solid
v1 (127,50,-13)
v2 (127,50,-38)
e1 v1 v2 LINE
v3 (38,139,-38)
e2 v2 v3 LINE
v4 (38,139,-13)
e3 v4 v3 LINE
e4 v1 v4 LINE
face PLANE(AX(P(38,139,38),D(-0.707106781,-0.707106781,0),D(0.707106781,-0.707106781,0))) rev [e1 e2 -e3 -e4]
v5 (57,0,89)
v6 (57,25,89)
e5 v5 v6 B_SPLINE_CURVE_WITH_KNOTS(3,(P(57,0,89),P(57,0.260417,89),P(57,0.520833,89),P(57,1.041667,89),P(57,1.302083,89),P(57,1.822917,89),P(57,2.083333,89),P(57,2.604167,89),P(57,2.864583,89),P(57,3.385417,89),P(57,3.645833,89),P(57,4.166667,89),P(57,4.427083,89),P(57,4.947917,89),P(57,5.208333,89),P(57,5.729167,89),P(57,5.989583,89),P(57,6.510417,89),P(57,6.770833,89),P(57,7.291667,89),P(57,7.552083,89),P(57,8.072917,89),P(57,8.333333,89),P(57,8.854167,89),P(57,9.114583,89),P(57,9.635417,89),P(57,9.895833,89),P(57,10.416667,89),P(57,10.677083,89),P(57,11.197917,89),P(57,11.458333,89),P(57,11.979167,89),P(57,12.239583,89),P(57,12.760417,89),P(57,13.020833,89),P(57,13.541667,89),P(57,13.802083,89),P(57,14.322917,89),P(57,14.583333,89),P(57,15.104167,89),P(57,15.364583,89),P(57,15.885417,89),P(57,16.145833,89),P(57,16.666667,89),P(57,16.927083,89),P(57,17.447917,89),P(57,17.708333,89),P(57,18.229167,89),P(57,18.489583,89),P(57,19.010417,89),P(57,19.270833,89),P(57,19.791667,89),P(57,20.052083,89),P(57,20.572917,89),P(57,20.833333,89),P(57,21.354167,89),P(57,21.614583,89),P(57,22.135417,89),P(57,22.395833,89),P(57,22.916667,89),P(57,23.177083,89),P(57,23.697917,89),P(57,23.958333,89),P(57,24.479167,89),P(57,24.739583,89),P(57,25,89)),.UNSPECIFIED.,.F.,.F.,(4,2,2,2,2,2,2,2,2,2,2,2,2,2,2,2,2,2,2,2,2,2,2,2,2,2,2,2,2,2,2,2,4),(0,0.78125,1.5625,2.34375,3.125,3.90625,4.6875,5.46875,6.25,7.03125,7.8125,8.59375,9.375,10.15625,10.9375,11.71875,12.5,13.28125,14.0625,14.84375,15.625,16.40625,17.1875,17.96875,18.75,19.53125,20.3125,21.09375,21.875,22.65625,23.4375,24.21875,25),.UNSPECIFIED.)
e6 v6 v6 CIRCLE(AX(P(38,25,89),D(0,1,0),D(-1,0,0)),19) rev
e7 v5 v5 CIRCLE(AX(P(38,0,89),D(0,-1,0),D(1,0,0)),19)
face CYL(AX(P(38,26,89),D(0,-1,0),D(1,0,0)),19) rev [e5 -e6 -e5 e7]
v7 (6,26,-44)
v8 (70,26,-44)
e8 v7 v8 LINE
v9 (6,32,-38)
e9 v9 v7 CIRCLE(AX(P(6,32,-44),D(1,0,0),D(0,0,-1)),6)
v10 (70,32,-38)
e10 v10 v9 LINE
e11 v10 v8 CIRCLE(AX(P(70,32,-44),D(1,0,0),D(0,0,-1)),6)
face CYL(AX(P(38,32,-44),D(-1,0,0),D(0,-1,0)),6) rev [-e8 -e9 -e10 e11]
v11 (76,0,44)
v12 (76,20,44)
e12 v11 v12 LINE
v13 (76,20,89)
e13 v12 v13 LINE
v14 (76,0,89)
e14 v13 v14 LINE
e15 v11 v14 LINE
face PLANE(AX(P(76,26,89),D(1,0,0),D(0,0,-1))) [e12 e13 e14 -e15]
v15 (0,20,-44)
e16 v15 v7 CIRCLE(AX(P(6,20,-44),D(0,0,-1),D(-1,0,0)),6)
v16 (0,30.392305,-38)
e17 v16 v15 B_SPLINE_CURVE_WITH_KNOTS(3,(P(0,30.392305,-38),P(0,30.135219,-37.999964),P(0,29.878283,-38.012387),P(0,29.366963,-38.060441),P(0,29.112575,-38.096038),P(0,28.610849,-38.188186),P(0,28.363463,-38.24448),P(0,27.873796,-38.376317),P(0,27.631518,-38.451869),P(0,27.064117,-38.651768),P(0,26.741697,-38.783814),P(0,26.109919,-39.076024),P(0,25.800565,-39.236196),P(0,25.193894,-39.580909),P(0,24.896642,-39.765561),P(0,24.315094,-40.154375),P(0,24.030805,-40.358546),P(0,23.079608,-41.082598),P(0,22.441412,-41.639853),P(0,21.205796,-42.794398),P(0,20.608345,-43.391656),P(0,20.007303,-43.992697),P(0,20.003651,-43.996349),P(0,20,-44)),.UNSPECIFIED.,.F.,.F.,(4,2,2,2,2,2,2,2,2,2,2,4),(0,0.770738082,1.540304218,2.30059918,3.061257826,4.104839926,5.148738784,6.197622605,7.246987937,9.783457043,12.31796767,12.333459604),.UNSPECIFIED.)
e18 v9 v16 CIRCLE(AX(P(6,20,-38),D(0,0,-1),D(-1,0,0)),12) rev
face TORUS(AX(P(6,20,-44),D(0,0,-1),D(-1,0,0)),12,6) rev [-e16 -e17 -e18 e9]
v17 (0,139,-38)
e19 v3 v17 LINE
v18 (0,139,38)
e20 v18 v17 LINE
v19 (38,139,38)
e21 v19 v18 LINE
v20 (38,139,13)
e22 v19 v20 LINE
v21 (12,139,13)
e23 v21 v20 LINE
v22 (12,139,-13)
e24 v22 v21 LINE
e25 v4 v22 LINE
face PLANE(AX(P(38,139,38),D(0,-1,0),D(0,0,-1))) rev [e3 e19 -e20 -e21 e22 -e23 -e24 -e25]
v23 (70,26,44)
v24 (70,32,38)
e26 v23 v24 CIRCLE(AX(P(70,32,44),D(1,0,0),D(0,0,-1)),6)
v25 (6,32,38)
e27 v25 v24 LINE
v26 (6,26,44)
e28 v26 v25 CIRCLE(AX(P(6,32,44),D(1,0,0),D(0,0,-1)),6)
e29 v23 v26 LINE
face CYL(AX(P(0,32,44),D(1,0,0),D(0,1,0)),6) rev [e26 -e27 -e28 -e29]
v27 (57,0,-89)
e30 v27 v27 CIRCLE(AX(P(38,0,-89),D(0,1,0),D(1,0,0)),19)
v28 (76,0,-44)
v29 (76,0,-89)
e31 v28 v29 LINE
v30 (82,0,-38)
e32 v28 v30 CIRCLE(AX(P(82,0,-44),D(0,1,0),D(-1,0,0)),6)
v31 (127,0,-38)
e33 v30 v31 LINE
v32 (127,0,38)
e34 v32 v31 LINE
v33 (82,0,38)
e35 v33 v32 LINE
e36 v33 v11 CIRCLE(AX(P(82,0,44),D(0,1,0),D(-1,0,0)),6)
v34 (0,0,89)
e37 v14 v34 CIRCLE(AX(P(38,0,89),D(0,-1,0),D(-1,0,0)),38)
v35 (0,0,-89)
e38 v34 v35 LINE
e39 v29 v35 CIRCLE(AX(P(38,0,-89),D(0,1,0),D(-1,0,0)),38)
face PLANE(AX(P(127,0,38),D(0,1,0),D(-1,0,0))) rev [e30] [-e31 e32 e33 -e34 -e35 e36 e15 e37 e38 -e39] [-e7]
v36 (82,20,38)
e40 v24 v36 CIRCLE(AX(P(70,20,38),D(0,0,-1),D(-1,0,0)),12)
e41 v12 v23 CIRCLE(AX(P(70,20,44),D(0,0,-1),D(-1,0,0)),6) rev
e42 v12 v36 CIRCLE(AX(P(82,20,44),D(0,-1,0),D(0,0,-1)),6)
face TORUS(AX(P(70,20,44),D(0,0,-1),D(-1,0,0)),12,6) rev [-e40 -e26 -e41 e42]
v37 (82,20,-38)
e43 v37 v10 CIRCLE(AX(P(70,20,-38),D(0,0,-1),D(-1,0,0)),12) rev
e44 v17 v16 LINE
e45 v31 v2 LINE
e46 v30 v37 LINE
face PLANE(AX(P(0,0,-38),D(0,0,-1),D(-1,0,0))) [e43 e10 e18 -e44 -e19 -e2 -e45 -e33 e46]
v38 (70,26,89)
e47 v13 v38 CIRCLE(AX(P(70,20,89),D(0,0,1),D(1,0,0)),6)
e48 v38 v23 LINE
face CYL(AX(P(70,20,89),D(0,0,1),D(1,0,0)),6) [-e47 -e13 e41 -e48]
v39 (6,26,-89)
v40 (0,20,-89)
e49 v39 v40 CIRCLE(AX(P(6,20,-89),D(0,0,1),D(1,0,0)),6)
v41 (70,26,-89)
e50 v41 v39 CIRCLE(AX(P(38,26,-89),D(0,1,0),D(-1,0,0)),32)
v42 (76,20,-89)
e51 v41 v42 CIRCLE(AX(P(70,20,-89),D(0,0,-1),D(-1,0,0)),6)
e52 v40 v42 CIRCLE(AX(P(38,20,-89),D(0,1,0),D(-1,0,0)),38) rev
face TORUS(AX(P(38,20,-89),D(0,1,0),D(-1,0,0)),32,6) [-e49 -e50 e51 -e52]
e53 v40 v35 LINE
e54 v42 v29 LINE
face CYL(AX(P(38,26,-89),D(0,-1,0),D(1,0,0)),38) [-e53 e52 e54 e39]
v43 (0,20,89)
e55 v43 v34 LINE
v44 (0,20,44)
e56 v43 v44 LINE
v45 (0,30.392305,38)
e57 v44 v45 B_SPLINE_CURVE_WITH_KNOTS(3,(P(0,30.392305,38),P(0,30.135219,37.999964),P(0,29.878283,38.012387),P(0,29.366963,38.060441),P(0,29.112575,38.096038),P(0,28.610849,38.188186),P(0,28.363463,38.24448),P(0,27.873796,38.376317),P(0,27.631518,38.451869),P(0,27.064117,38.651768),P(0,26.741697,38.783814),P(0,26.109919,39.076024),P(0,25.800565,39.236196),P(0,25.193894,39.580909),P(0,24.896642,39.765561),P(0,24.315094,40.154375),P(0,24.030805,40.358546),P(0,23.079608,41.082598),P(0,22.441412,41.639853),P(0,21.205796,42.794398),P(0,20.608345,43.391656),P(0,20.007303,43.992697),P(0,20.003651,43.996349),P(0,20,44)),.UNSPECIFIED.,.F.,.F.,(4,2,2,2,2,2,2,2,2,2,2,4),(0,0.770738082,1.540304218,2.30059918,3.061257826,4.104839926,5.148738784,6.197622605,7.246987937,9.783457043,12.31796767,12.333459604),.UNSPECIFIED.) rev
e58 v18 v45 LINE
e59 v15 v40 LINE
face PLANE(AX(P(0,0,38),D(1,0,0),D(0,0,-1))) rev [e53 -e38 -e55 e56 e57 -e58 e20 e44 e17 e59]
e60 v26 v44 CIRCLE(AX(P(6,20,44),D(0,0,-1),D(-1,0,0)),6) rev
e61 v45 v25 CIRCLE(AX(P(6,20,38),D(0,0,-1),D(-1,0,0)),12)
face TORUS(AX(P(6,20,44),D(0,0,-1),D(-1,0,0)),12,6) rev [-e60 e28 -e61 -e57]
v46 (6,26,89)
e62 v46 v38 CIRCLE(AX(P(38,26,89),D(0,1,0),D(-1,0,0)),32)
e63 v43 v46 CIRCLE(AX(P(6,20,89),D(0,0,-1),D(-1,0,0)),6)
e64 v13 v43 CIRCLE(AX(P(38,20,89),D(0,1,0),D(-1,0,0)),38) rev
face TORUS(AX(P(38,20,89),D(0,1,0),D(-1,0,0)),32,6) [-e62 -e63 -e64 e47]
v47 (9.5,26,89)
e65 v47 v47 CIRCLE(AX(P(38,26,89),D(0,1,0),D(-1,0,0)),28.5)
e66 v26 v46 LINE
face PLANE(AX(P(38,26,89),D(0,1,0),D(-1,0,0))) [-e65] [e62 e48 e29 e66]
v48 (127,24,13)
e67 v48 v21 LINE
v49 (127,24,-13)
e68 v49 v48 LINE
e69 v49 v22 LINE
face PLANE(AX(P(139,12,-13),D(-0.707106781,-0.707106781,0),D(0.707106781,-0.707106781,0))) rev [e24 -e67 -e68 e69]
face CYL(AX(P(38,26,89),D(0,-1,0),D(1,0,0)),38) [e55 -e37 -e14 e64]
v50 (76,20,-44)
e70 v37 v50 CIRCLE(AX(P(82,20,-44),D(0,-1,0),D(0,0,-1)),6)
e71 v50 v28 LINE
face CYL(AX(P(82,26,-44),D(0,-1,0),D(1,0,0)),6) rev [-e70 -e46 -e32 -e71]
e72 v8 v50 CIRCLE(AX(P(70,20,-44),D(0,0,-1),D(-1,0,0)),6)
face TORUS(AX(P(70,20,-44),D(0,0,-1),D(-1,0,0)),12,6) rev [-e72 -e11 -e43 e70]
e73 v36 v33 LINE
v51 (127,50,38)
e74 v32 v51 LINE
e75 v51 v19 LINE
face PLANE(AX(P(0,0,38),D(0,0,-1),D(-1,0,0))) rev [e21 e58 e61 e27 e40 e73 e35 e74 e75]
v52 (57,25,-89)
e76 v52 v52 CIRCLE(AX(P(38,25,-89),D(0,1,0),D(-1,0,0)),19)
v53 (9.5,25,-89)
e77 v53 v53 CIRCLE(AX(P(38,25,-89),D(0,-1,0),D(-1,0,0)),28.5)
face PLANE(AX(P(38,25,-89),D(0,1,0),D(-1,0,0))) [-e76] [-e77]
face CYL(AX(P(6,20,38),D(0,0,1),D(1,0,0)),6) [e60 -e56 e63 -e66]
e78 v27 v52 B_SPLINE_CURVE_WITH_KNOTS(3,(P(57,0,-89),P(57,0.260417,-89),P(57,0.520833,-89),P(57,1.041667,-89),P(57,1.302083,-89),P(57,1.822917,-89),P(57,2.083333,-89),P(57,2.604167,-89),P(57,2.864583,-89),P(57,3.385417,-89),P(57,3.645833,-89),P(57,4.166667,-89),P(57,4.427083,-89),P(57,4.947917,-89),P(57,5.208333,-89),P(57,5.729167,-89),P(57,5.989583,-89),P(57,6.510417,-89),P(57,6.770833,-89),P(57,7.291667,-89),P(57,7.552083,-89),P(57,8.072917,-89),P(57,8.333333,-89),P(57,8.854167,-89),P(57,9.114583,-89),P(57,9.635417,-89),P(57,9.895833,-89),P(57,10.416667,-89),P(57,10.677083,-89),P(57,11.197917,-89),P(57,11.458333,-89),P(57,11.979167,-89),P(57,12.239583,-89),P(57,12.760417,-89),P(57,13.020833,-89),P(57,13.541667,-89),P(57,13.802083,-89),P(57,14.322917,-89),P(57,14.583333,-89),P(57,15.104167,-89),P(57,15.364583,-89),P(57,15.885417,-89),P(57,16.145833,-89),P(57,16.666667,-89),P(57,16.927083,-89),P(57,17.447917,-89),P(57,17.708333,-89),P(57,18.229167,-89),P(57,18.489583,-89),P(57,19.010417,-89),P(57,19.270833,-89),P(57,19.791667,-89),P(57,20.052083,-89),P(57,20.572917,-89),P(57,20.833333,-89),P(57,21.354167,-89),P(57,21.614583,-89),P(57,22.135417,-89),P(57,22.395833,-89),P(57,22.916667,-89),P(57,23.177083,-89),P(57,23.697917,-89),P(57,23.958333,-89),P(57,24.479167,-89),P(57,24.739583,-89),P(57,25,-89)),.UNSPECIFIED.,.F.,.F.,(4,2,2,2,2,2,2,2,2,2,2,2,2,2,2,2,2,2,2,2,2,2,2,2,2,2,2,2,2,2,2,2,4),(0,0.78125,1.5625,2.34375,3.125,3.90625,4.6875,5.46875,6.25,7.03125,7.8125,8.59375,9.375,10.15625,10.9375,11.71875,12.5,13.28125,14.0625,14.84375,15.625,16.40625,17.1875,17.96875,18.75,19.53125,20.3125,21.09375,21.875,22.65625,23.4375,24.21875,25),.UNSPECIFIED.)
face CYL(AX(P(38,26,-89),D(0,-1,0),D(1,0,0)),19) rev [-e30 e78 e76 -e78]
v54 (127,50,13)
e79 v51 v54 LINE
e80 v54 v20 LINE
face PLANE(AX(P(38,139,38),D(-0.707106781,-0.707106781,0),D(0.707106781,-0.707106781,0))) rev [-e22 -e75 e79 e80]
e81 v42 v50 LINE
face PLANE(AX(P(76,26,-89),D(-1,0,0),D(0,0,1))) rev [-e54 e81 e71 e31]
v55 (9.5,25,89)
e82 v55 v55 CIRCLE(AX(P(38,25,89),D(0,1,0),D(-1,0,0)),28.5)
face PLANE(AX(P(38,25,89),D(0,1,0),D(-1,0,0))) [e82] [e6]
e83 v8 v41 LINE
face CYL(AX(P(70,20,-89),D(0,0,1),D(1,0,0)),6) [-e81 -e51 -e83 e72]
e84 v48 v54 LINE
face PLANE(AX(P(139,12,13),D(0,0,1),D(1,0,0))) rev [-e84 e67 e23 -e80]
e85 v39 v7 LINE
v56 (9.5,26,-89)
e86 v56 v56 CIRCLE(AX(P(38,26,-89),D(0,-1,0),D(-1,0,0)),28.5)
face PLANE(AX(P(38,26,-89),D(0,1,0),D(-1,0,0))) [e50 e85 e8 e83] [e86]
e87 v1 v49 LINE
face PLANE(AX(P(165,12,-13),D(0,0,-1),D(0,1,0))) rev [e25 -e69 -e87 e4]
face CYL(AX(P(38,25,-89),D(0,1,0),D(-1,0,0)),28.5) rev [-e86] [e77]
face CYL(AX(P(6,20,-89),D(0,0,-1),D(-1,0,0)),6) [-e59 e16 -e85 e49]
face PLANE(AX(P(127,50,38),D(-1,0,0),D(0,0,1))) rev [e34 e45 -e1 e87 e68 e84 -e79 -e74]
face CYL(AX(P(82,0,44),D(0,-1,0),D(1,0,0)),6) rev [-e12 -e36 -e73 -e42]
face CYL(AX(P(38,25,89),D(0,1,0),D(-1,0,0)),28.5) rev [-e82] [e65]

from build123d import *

# Parameters (mm, degrees)
SALIENTE_EXTRUIR1_DEPTH  = 38
CORTAR_EXTRUIR1_DEPTH    = 273.053680503
CROQUIS3_R               = 19
SALIENTE_EXTRUIR3_DEPTH  = 26
REDONDEO1_R              = 6
CROQUIS4_R               = 28.5
CORTAR_EXTRUIR2_DEPTH    = 1
REDONDEO1_OF_SIMETR_A1_R = 6
REDONDEO2_R              = 6


with BuildPart() as part:
    # Croquis1 → Saliente-Extruir1 (new, symmetric)
    with BuildSketch(Plane.XY):
        Polygon((0, 0), (0, 139), (38, 139), (127, 50), (127, 0), align=None)
    extrude(amount=SALIENTE_EXTRUIR1_DEPTH, both=True)

    # Croquis2 → Cortar-Extruir1 (cut, through all, along a direction that is not the sketch's normal)
    with BuildSketch(Plane(origin=(0, 139, 0), x_dir=(1, 0, 0), z_dir=(0, 1, 0))):
        Polygon((38, 0), (38, 13), (12, 13), (12, -13), (38, -13), align=None)
    extrude(amount=-CORTAR_EXTRUIR1_DEPTH, dir=(-0.7071067811865515, 0.7071067811865436, 0), mode=Mode.SUBTRACT)

    # Croquis3 → Saliente-Extruir3 (add)
    with BuildSketch(Plane.XZ):
        with BuildLine():
            Line((0, 38), (0, 89))
            ThreePointArc((0, 89), (38, 127), (76, 89))
            Line((76, 89), (76, 38))
            Line((76, 38), (0, 38))
        make_face()
        with Locations((38, 89)):
            Circle(CROQUIS3_R, mode=Mode.SUBTRACT)
    saliente_extruir3 = extrude(amount=-SALIENTE_EXTRUIR3_DEPTH)

    # Redondeo1
    redondeo1_edges = [part.edges().sort_by_distance(p)[0] for p in [
        (38, 26, 127),
        (76, 26, 63.5),
        (0, 26, 63.5),
    ]]
    fillet(redondeo1_edges, radius=REDONDEO1_R)

    # Croquis4 → Cortar-Extruir2 (cut)
    with BuildSketch(Plane(origin=(0, 26, 0), x_dir=(1, 0, 0), z_dir=(0, 1, 0))):
        with Locations(Location((38, -89, 0), (0, 0, 180))):
            Circle(CROQUIS4_R)
    cortar_extruir2 = extrude(amount=-CORTAR_EXTRUIR2_DEPTH, mode=Mode.SUBTRACT)

    # Simetría1: Saliente-Extruir3, Cortar-Extruir2 across plane
    add(saliente_extruir3.mirror(Plane.XY))
    add(cortar_extruir2.mirror(Plane.XY), mode=Mode.SUBTRACT)

    # Redondeo1 of Simetría1
    redondeo1_of_simetr_a1_edges = [part.edges().sort_by_distance(p)[0] for p in [
        (38, 26, -127),
        (76, 26, -63.5),
        (0, 26, -63.5),
    ]]
    fillet(redondeo1_of_simetr_a1_edges, radius=REDONDEO1_OF_SIMETR_A1_R)

    # Redondeo2
    # the kernel refuses this fillet: 6 mm, written as the material it adds along each edge
    with BuildSketch(Plane(origin=(70, 26, 38), x_dir=(0, 0, 1), z_dir=(-1, 0, 0))) as redondeo2_piece_1:
        with BuildLine():
            CenterArc((REDONDEO2_R, REDONDEO2_R), REDONDEO2_R, 180, 90)
            Line((0, REDONDEO2_R), (0, 0))
            Line((0, 0), (REDONDEO2_R, 0))
        make_face()
    extrude(amount=64)
    with BuildSketch(Plane(origin=(76, 0, 38), x_dir=(0, 0, 1), z_dir=(0, 1, 0))) as redondeo2_piece_2:
        with BuildLine():
            CenterArc((REDONDEO2_R, REDONDEO2_R), REDONDEO2_R, 180, 90)
            Line((0, REDONDEO2_R), (0, 0))
            Line((0, 0), (REDONDEO2_R, 0))
        make_face()
    extrude(amount=20)
    with BuildSketch(Plane(origin=(6, 20, 38), x_dir=(0.8017442392976484, -0.5976672776328276, 0), z_dir=(0.5976672776328276, 0.8017442392976484, 0))) as redondeo2_piece_3_section:
        with BuildLine():
            CenterArc((6 + REDONDEO2_R, -REDONDEO2_R), REDONDEO2_R, 90, 90)
            Line((6 + REDONDEO2_R, 0), (6, 0))
            Line((6, 0), (6, -REDONDEO2_R))
        make_face()
    redondeo2_piece_3 = revolve(axis=Axis((6, 20, 38), (0, 0, -1)), revolution_arc=233.296989237, mode=Mode.PRIVATE)
    redondeo2_piece_3 = split(redondeo2_piece_3, bisect_by=Plane(origin=(0, 24.499633638, 39.86976996), z_dir=(1, 0, 0)), keep=Keep.TOP, mode=Mode.PRIVATE)
    add(redondeo2_piece_3)
    with BuildSketch(Plane(origin=(70, 20, 38), x_dir=(1, 0, 0), z_dir=(0, -1, 0))) as redondeo2_piece_4:
        with BuildLine():
            CenterArc((6 + REDONDEO2_R, REDONDEO2_R), REDONDEO2_R, 180, 90)
            Line((6 + REDONDEO2_R, 0), (6, 0))
            Line((6, 0), (6, REDONDEO2_R))
        make_face()
    revolve(axis=Axis((70, 20, 38), (0, 0, 1)), revolution_arc=90)
    with BuildSketch(Plane(origin=(70, 26, -38), x_dir=(0, 0, -1), z_dir=(-1, 0, 0))) as redondeo2_piece_5:
        with BuildLine():
            CenterArc((REDONDEO2_R, -REDONDEO2_R), REDONDEO2_R, 90, 90)
            Line((0, -REDONDEO2_R), (0, 0))
            Line((0, 0), (REDONDEO2_R, 0))
        make_face()
    extrude(amount=64)
    with BuildSketch(Plane(origin=(76, 0, -38), x_dir=(0, 0, -1), z_dir=(0, 1, 0))) as redondeo2_piece_6:
        with BuildLine():
            CenterArc((REDONDEO2_R, -REDONDEO2_R), REDONDEO2_R, 90, 90)
            Line((0, -REDONDEO2_R), (0, 0))
            Line((0, 0), (REDONDEO2_R, 0))
        make_face()
    extrude(amount=20)
    with BuildSketch(Plane(origin=(6, 20, -38), x_dir=(0.8017442392976486, -0.5976672776328271, 0), z_dir=(0.5976672776328271, 0.8017442392976486, 0))) as redondeo2_piece_7_section:
        with BuildLine():
            CenterArc((6 + REDONDEO2_R, REDONDEO2_R), REDONDEO2_R, 180, 90)
            Line((6, REDONDEO2_R), (6, 0))
            Line((6, 0), (6 + REDONDEO2_R, 0))
        make_face()
    redondeo2_piece_7 = revolve(axis=Axis((6, 20, -38), (0, 0, -1)), revolution_arc=233.296989237, mode=Mode.PRIVATE)
    redondeo2_piece_7 = split(redondeo2_piece_7, bisect_by=Plane(origin=(0, 24.499633653, -39.869769899), z_dir=(1, 0, 0)), keep=Keep.TOP, mode=Mode.PRIVATE)
    add(redondeo2_piece_7)
    with BuildSketch(Plane(origin=(70, 20, -38), x_dir=(1, 0, 0), z_dir=(0, -1, 0))) as redondeo2_piece_8:
        with BuildLine():
            CenterArc((6 + REDONDEO2_R, -REDONDEO2_R), REDONDEO2_R, 90, 90)
            Line((6 + REDONDEO2_R, 0), (6, 0))
            Line((6, 0), (6, -REDONDEO2_R))
        make_face()
    revolve(axis=Axis((70, 20, -38), (0, 0, 1)), revolution_arc=90)


solid = part.part
